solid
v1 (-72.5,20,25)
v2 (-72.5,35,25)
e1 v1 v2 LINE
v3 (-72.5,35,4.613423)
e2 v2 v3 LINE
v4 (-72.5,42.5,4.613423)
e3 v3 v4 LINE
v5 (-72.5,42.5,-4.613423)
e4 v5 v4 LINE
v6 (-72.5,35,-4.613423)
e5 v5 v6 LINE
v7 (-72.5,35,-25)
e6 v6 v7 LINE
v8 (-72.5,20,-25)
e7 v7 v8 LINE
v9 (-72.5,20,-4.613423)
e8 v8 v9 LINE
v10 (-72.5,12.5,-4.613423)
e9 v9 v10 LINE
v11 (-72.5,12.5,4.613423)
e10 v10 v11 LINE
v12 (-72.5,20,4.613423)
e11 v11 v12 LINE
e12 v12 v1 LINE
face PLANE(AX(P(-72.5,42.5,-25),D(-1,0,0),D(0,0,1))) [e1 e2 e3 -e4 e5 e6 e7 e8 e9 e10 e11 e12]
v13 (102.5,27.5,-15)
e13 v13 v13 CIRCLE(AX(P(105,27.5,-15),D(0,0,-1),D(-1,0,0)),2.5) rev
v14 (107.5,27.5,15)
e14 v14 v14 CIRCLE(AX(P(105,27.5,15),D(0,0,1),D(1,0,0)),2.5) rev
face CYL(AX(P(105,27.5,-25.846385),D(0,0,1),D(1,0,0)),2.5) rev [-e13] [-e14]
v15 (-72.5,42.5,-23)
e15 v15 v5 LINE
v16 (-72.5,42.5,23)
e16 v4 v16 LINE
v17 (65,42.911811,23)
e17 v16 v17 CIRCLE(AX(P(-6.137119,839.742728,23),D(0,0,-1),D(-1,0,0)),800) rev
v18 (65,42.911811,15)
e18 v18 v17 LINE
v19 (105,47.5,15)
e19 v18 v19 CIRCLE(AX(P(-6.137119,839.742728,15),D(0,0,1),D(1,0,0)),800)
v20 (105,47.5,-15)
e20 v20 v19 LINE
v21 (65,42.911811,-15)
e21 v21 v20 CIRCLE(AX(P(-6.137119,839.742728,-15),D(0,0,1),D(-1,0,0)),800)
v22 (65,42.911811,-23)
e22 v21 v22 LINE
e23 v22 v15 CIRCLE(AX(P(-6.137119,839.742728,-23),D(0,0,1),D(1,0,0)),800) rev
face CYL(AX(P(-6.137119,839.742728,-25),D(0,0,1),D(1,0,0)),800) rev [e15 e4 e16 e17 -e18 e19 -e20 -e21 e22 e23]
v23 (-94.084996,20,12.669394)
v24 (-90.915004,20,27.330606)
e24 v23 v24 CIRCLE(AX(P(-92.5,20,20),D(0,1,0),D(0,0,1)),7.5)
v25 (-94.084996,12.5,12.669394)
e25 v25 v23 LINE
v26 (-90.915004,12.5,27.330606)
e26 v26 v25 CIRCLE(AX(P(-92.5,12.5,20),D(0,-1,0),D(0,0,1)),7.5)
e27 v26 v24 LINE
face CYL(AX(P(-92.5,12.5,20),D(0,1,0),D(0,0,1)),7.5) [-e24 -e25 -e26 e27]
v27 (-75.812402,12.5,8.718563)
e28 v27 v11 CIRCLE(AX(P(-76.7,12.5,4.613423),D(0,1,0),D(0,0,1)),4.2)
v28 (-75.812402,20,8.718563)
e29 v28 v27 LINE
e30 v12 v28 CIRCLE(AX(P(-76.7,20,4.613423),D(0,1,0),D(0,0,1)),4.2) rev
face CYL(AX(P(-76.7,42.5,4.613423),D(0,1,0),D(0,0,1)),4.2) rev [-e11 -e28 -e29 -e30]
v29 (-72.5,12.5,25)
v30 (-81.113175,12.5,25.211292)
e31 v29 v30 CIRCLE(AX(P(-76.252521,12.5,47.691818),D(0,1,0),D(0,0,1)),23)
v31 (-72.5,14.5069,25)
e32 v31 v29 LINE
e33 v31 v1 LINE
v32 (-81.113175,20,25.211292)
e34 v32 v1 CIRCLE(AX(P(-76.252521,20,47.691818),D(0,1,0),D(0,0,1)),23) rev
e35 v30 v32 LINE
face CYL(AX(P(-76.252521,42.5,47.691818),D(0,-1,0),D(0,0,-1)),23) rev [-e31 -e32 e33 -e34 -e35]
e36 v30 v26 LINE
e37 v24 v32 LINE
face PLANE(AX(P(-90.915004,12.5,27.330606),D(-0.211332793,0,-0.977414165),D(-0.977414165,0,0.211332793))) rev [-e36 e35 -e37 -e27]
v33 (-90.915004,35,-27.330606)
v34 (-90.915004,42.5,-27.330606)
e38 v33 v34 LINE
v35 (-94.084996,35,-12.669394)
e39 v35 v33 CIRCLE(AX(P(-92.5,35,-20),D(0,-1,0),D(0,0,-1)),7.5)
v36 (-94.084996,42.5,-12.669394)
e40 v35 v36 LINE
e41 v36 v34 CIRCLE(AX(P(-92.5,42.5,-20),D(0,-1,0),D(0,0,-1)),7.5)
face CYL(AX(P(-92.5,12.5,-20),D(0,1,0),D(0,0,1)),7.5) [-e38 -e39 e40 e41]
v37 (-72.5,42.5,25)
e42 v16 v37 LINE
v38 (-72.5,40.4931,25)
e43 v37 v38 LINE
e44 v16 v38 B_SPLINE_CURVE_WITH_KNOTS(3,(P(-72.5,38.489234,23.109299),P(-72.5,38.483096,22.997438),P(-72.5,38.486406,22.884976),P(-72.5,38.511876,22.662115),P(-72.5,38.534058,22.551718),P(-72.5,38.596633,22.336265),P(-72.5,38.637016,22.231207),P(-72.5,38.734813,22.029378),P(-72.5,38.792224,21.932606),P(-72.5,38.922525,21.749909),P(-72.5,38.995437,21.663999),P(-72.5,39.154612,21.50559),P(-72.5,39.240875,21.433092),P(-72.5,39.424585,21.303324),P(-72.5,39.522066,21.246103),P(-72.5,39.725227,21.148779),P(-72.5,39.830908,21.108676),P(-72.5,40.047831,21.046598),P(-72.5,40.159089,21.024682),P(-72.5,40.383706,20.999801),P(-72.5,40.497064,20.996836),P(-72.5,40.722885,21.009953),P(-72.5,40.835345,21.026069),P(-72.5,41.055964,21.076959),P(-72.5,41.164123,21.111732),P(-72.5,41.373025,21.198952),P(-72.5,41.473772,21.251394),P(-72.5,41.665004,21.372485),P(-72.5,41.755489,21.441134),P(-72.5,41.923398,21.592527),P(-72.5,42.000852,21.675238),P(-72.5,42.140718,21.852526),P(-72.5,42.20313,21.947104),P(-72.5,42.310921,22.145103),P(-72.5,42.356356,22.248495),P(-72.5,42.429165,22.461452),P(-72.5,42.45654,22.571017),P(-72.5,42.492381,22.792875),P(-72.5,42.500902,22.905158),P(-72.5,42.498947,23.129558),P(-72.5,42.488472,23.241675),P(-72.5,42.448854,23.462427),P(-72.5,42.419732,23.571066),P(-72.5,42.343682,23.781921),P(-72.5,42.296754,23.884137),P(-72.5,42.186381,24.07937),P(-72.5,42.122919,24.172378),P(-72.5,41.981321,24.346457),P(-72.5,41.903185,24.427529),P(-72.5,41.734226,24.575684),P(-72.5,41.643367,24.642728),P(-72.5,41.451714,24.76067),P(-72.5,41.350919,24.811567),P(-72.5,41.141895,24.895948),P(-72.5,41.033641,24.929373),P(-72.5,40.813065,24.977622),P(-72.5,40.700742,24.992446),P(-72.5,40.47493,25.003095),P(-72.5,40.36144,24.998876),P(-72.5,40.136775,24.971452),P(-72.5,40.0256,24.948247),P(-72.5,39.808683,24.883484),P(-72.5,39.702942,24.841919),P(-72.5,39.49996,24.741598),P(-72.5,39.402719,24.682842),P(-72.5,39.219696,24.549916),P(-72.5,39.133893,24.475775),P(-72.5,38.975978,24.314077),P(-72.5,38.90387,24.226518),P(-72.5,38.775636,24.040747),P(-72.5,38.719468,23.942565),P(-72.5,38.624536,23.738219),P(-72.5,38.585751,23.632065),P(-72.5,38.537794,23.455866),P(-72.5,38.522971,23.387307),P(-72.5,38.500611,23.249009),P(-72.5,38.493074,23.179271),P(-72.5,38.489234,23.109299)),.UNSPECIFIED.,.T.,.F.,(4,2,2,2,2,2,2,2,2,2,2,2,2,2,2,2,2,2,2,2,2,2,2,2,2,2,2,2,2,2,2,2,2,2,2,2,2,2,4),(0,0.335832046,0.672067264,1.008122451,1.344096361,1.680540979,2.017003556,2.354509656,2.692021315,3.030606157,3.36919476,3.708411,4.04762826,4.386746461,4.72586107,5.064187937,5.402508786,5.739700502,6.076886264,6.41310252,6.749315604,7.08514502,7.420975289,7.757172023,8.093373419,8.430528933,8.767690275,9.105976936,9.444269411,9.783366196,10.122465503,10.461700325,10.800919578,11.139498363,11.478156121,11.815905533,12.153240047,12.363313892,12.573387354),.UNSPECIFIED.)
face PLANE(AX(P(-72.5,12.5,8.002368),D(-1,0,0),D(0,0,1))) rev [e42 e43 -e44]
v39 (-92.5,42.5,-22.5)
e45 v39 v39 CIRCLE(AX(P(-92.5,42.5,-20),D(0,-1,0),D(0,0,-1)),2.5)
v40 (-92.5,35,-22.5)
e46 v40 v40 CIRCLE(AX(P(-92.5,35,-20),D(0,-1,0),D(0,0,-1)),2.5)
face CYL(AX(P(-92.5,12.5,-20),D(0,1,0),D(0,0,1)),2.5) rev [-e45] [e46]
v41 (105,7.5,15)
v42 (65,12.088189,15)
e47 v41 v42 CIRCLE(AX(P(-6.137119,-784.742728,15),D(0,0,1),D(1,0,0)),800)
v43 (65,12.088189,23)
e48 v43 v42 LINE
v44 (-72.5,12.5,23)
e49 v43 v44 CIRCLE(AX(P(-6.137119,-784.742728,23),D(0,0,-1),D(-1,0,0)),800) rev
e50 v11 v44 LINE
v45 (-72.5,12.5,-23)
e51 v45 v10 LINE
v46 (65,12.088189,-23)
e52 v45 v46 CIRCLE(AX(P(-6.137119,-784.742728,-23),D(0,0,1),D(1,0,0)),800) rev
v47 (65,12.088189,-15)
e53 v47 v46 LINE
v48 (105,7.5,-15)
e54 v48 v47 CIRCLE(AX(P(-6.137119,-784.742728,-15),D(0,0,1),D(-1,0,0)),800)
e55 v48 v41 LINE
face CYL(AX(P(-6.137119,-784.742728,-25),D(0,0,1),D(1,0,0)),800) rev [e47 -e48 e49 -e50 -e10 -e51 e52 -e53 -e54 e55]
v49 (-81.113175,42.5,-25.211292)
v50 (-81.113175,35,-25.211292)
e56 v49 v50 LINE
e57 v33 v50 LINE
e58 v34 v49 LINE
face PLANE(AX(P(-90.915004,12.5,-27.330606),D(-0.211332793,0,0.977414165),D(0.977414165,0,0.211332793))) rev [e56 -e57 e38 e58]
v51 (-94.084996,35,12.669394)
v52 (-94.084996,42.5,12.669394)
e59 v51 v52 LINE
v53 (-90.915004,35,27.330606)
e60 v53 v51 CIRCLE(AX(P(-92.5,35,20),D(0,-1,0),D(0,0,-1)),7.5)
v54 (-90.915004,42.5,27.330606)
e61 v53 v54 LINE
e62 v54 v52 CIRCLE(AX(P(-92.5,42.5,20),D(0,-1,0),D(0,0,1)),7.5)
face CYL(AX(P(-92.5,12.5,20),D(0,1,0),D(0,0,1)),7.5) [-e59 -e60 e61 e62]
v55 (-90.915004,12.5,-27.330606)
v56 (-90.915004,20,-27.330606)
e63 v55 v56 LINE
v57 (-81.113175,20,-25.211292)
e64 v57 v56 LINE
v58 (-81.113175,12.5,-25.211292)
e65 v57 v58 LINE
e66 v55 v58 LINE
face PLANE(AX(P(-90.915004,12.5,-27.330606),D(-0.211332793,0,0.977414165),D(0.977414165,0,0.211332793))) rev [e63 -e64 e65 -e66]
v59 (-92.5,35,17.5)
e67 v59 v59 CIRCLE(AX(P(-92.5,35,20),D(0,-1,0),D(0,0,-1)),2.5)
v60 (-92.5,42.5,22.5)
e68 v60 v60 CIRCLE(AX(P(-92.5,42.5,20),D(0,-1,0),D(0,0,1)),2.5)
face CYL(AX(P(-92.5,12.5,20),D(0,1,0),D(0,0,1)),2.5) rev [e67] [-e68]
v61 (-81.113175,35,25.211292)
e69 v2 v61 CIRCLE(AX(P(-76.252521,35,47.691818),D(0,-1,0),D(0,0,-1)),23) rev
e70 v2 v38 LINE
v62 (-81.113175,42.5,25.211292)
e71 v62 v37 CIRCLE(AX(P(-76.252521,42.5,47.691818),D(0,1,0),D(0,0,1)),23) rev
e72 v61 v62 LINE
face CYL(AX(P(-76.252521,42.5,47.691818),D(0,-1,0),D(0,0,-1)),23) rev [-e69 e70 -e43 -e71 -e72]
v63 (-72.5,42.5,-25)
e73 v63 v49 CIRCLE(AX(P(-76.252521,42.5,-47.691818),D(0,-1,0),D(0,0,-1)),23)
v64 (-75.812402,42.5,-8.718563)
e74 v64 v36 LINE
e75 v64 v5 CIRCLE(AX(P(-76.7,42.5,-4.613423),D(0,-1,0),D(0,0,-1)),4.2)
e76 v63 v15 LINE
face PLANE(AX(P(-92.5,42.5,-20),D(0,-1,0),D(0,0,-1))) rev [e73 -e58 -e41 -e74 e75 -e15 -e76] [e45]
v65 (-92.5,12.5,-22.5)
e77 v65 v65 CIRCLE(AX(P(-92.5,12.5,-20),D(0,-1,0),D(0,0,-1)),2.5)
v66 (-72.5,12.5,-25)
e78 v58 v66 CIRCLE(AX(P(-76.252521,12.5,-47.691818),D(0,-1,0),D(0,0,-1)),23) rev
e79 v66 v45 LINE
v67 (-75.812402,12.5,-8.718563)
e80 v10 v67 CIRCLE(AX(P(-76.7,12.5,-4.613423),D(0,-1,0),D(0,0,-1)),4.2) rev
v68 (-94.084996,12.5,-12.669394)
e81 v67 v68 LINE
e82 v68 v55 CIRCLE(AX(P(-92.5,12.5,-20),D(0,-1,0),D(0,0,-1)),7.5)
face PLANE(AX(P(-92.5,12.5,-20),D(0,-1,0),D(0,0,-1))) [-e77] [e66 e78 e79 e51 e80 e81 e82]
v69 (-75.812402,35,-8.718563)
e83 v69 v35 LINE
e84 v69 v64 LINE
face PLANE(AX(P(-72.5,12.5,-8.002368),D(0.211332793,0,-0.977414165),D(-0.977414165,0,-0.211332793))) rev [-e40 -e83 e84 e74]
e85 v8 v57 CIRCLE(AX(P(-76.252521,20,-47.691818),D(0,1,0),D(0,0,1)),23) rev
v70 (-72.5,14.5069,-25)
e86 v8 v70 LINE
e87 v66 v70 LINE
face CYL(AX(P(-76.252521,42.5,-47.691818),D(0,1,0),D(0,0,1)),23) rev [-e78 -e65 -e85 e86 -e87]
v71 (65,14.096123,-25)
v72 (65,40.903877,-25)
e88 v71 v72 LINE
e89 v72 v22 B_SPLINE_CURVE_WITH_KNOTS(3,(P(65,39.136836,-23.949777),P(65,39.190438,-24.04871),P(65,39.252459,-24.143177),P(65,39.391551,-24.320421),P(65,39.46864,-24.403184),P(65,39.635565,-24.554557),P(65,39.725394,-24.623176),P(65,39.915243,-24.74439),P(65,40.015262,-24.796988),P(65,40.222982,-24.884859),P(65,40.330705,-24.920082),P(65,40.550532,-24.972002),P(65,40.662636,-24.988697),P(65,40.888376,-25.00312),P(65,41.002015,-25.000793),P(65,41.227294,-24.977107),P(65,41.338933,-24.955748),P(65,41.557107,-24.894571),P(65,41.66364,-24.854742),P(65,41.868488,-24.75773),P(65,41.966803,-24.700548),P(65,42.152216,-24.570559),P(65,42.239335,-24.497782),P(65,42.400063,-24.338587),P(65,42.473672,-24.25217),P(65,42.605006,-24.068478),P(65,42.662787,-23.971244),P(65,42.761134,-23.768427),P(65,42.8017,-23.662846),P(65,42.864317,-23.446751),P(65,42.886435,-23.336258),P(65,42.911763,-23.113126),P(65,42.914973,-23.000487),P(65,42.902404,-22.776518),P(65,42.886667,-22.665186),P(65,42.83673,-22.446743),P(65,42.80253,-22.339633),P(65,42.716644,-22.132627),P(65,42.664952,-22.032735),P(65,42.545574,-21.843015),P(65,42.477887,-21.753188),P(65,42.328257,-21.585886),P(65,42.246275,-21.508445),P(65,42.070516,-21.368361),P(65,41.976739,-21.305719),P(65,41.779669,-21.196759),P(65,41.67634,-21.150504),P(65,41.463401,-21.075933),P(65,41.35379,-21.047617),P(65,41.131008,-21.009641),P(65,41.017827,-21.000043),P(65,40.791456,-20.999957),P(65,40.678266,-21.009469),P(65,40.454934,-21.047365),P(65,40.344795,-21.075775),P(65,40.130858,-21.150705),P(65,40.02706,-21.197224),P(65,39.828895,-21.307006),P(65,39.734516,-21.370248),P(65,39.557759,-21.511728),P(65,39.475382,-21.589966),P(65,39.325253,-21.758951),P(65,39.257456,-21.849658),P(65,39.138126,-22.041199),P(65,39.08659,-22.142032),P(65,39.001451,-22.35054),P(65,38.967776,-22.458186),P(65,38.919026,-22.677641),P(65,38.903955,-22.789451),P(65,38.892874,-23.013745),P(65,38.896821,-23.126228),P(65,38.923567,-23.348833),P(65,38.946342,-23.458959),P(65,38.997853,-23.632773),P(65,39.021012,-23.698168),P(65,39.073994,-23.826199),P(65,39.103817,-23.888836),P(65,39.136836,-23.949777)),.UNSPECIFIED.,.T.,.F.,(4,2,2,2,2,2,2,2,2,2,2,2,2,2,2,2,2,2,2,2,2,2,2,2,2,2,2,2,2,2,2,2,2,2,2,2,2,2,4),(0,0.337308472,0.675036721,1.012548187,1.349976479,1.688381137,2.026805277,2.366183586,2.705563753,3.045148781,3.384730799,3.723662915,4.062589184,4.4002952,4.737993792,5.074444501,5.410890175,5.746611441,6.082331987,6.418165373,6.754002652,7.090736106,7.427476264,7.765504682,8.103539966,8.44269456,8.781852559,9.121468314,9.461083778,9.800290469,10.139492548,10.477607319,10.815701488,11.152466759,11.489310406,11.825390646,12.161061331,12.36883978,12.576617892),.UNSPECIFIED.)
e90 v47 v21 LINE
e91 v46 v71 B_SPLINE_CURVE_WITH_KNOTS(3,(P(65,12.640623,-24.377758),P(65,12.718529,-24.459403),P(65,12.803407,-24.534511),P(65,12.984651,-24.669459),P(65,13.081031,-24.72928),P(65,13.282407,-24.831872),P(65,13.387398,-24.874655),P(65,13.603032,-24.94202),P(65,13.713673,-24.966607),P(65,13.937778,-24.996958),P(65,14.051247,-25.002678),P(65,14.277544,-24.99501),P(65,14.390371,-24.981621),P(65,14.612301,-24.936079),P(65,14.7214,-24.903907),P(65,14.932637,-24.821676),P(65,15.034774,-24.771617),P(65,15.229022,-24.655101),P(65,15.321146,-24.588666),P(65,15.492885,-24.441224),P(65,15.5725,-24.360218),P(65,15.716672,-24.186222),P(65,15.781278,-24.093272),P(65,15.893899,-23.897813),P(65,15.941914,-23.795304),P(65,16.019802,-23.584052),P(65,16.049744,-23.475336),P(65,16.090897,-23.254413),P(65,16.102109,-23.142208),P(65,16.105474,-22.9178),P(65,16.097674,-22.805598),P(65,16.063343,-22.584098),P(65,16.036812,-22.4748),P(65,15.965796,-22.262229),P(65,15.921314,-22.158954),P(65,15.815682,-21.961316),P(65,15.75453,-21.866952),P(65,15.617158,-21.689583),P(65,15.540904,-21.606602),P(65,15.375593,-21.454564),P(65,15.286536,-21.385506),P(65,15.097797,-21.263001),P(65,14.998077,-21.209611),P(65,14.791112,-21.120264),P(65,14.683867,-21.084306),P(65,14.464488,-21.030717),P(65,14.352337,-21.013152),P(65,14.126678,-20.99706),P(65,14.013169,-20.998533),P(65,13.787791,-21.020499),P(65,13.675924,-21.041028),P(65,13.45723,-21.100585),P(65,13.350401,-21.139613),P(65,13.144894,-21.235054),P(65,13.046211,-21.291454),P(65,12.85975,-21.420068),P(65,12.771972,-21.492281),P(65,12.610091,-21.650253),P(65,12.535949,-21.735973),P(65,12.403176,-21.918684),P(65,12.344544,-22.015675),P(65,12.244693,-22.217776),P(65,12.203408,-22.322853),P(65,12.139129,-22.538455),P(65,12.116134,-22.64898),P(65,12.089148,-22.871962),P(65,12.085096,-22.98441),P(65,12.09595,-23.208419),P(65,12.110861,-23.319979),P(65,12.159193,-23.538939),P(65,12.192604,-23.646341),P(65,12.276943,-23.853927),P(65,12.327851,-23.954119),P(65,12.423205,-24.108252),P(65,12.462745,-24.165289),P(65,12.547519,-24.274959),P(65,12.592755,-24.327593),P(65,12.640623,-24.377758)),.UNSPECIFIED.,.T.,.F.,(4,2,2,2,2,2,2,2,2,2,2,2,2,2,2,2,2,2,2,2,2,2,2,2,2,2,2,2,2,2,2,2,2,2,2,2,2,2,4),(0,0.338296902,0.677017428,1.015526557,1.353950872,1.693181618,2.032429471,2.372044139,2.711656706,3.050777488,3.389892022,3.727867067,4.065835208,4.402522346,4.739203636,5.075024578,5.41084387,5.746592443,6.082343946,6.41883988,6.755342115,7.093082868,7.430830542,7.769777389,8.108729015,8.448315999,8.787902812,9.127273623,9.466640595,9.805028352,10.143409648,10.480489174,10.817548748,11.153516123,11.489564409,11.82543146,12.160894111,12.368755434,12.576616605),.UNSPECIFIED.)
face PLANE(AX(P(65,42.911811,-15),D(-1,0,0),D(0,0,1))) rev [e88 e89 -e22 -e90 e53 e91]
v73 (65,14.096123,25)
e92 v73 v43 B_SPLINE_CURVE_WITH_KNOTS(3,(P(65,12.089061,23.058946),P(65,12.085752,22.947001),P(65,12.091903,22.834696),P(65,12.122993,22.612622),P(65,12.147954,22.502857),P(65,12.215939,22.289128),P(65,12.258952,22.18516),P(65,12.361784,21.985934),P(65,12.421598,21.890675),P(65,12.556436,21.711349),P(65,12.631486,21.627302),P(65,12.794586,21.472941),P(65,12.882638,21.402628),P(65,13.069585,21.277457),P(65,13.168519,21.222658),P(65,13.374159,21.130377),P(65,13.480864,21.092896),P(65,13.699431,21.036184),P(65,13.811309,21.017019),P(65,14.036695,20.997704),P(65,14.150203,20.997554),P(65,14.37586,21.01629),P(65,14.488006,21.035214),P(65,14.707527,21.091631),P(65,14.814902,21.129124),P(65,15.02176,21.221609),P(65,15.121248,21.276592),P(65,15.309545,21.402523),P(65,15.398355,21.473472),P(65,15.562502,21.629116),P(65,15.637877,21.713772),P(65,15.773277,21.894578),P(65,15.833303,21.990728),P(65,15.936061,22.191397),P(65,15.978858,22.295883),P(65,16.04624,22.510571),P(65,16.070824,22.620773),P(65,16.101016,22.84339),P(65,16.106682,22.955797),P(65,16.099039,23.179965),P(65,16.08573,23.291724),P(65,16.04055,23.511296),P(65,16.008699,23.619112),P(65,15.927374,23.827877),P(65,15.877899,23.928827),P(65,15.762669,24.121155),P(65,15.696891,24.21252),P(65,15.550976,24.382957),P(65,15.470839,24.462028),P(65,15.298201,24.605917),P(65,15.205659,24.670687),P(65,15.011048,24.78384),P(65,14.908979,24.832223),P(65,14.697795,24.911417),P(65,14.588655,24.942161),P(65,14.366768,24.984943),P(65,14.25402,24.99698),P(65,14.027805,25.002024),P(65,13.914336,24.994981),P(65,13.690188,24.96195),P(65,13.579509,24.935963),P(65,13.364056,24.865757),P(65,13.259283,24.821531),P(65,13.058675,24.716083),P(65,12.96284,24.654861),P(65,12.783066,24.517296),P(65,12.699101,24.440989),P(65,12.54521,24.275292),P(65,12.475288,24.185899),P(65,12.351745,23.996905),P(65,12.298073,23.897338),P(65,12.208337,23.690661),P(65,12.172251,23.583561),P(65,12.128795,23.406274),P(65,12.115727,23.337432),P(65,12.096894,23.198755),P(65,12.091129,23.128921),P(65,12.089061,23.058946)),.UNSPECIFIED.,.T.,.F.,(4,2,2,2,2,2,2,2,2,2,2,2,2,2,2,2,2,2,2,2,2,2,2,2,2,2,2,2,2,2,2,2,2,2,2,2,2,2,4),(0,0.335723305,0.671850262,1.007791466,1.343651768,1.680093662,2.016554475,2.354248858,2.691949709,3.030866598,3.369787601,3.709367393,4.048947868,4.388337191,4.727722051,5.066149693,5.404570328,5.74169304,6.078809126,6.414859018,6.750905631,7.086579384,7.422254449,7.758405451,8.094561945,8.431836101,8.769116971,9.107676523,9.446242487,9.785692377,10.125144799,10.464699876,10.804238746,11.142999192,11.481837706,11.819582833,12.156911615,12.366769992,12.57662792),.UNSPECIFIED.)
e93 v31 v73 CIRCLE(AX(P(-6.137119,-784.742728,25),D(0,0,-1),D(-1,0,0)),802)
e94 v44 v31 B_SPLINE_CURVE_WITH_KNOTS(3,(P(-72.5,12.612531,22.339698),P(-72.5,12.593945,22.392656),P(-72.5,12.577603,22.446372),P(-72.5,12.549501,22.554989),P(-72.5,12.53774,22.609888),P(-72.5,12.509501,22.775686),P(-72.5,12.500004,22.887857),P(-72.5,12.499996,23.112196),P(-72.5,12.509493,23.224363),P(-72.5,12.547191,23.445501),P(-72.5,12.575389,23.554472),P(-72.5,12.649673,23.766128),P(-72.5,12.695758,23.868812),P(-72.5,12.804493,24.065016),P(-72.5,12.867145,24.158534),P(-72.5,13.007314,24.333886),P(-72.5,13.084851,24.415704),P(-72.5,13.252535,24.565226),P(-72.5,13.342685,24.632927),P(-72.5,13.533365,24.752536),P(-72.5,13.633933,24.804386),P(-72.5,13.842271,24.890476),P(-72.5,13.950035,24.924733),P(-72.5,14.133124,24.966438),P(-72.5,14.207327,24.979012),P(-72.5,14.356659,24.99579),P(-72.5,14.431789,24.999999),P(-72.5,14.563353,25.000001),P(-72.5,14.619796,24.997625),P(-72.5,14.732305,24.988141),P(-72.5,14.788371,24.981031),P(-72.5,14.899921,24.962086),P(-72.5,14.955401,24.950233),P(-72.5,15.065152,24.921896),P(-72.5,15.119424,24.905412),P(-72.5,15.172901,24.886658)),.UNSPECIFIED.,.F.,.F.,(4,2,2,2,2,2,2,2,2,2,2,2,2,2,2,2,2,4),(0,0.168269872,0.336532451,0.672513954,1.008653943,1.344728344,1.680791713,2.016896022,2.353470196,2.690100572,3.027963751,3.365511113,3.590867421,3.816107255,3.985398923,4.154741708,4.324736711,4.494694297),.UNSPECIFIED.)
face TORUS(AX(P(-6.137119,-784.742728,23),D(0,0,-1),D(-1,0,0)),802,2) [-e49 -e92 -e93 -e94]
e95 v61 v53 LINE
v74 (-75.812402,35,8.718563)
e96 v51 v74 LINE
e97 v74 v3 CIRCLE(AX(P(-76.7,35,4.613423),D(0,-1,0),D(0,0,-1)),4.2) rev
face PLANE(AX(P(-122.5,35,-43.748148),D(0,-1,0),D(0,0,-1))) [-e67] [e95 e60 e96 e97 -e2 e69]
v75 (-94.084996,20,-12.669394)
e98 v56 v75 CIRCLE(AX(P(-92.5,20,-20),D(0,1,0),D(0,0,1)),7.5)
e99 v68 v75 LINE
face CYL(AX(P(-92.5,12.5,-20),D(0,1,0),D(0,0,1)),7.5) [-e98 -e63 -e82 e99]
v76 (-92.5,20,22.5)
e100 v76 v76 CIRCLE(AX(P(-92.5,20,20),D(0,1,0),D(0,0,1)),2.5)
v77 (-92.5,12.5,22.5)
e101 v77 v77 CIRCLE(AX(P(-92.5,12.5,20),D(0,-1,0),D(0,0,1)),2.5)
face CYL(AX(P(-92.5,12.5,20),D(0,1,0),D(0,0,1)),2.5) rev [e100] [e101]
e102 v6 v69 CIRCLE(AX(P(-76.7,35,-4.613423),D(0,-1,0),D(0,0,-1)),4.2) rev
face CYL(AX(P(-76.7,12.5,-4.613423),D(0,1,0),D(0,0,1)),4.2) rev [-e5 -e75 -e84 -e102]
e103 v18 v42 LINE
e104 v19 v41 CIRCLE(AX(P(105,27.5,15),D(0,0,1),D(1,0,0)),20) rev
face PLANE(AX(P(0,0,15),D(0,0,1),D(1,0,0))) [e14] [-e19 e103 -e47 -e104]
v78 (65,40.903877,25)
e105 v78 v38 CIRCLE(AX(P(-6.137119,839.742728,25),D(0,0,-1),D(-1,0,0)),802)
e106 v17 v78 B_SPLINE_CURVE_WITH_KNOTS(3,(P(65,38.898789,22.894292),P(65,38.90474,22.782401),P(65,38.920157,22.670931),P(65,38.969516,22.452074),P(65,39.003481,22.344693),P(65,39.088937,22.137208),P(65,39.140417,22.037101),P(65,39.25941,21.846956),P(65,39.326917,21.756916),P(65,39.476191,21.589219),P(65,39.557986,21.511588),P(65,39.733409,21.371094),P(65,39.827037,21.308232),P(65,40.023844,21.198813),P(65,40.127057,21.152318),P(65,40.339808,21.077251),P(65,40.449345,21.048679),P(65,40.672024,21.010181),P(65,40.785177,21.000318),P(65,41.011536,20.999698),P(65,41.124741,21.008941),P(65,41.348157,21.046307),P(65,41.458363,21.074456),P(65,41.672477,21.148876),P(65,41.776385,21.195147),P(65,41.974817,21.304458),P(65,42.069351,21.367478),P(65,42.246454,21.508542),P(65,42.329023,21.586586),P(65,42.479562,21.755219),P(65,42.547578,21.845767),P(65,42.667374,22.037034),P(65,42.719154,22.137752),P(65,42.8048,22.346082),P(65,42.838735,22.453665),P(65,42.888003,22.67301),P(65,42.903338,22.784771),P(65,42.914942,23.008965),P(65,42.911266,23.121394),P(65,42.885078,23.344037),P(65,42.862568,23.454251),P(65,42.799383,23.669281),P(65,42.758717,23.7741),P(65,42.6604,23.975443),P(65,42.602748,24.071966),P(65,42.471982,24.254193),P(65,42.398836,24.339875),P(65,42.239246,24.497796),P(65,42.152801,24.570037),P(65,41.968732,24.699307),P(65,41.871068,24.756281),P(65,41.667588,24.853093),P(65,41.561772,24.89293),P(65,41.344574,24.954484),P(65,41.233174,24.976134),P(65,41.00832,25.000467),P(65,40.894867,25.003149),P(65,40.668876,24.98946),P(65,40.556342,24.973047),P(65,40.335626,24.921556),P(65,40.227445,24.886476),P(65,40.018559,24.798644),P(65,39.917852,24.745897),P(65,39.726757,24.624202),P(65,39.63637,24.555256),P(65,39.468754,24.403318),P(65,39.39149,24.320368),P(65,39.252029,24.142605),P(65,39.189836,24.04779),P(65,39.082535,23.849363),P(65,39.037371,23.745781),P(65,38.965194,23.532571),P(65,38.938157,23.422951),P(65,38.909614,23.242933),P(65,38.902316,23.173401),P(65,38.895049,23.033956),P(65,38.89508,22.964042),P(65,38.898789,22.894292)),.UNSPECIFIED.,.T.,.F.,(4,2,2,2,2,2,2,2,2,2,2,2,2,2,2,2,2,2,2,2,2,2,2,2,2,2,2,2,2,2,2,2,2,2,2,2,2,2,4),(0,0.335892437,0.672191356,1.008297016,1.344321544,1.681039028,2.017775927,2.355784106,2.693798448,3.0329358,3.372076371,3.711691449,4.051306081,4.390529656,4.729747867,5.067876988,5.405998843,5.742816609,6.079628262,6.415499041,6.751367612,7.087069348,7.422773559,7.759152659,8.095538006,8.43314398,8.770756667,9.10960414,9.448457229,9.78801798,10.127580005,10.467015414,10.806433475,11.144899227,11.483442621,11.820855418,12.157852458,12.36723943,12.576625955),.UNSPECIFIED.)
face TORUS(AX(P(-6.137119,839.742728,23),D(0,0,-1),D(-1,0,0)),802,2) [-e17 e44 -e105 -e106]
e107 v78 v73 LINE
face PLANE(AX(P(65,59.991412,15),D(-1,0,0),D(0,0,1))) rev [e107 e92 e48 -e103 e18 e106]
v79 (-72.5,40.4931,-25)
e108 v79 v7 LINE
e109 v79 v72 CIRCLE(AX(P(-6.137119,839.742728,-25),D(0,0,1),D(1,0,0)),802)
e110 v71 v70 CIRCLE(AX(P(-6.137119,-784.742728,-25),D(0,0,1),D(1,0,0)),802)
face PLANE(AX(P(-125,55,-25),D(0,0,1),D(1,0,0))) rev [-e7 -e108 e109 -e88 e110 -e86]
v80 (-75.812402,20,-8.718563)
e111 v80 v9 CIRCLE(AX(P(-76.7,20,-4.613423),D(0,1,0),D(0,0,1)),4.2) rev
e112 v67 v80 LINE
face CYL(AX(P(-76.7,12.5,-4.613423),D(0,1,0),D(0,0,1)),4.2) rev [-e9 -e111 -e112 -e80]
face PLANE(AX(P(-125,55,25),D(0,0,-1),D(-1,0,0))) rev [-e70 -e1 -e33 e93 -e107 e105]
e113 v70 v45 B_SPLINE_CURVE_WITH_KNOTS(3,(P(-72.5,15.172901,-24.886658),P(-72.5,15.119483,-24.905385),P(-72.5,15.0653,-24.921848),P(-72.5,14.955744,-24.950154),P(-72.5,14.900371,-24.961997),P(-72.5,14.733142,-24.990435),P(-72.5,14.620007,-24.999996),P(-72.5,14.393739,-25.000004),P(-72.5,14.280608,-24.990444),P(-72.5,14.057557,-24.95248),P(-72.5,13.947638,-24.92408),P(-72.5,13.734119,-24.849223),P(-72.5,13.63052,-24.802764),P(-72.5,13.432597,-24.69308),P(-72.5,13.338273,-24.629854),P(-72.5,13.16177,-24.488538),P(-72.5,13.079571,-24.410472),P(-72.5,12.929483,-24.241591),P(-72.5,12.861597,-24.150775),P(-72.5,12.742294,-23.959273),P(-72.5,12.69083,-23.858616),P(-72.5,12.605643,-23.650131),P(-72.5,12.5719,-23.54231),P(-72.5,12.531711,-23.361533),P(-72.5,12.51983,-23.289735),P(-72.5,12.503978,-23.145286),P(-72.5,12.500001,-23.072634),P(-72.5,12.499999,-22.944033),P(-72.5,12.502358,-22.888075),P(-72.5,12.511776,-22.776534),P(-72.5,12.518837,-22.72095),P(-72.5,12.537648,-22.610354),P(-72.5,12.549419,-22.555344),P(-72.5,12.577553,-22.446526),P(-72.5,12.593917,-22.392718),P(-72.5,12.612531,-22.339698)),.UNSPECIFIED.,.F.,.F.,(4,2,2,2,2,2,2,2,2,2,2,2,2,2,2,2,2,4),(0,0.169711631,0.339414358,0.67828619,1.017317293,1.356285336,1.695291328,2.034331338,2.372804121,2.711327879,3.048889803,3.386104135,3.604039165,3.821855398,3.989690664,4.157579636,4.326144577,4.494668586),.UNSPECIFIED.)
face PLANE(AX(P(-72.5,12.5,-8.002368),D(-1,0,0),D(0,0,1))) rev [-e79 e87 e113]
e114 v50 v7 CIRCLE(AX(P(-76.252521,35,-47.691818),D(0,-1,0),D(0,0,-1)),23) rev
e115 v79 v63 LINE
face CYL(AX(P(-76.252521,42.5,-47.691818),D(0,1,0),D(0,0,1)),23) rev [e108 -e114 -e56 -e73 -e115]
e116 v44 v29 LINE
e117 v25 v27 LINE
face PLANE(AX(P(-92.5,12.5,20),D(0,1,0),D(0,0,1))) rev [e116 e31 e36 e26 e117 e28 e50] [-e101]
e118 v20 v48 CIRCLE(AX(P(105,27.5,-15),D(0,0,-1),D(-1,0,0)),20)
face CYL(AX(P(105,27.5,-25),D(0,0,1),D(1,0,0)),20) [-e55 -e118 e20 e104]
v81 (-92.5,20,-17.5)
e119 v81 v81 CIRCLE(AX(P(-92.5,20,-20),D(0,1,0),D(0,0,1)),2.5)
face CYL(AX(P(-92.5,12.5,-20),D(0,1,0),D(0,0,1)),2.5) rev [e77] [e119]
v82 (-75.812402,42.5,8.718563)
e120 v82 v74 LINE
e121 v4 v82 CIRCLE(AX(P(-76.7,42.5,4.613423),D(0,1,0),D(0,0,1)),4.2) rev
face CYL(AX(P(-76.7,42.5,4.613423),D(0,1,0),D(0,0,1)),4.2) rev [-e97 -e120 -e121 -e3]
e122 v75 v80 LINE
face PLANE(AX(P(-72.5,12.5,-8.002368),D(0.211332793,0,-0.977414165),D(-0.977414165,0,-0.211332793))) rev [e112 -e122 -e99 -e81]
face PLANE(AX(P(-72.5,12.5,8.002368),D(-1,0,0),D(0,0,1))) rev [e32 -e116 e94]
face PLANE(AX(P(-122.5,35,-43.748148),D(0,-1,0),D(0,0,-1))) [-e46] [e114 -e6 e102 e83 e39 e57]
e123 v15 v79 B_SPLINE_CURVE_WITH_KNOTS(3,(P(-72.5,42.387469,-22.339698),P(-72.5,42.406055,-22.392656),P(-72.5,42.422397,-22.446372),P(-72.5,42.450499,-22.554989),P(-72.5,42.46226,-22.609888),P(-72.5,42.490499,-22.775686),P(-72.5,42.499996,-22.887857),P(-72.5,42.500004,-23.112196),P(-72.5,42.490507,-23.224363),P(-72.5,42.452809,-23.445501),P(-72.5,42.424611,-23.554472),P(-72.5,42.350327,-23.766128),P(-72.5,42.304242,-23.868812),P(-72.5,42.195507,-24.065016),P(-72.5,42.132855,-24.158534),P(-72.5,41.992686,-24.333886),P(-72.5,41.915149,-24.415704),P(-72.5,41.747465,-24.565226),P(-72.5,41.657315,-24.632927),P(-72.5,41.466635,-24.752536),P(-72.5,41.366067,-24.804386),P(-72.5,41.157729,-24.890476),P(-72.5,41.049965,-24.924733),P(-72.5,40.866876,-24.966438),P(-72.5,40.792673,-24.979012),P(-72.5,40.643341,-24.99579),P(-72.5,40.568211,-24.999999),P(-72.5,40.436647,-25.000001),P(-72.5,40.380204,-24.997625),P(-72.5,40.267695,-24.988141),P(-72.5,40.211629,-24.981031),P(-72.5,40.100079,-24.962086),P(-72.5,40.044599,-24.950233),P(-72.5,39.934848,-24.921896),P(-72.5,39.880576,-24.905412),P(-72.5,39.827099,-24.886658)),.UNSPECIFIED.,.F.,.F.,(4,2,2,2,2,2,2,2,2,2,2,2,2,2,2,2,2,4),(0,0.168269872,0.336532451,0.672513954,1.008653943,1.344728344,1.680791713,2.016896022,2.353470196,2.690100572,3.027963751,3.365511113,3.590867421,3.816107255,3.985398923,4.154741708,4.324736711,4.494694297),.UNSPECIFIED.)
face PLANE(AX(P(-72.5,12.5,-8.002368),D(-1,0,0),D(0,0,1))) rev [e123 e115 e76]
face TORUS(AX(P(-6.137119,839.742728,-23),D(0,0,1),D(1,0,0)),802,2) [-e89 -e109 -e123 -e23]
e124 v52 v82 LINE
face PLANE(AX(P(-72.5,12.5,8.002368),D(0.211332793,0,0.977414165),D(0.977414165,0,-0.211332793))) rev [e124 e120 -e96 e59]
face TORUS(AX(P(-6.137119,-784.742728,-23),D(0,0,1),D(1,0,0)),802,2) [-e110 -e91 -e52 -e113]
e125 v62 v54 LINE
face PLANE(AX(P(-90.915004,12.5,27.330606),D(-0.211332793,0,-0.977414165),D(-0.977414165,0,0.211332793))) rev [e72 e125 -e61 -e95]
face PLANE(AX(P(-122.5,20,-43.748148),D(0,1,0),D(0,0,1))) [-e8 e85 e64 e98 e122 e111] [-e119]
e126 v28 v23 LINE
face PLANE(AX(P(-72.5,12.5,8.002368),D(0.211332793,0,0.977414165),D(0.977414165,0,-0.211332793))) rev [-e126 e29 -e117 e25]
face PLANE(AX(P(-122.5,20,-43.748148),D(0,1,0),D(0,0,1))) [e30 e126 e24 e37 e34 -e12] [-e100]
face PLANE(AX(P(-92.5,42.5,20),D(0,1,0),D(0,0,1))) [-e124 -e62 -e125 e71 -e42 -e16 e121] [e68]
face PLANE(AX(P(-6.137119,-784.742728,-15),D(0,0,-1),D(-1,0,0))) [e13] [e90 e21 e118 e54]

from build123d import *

# Parameters (mm, degrees)
SKETCH1_W               = 250
SKETCH1_H               = 50
BOSS_EXTRUDE1_DEPTH     = 55
CUT_EXTRUDE2_DEPTH      = 146.430395722
CUT_EXTRUDE2_DEPTH_BACK = 146.430395722
SKETCH4_OUTSIDE_W       = 304.164
SKETCH4_OUTSIDE_H       = 109.164
FILLET2_R               = 2
CUT_EXTRUDE3_DEPTH      = 143.762915509
CUT_EXTRUDE3_DEPTH_BACK = 143.762915509
SKETCH7_R               = 2.5
SKETCH12_W              = 86.46924187
SKETCH12_H              = 64.710234819
CUT_EXTRUDE7_DEPTH      = 10
CUT_EXTRUDE8_DEPTH      = 10
SKETCH14_R              = 2.5
BOSS_EXTRUDE2_DEPTH     = 30
SKETCH16_W              = 96.26246385
SKETCH16_H              = 15
CUT_EXTRUDE9_DEPTH      = 50
FILLET3_R               = 4.2
FILLET4_R               = 23


with BuildPart() as part:
    # Sketch1 → Boss-Extrude1 (new body)
    with BuildSketch(Plane(origin=(0, 0, 0), x_dir=(1, 0, 0), z_dir=(0, 1, 0))):
        Rectangle(SKETCH1_W, SKETCH1_H)
    extrude(amount=BOSS_EXTRUDE1_DEPTH)

    # Sketch4 outside → Cut-Extrude2 (cut, two sides: drawn at the far end of the back side and taken through both)
    with BuildSketch(Plane.XY.offset(25).offset(-CUT_EXTRUDE2_DEPTH_BACK)):
        with Locations((0, 27.5)):
            Rectangle(SKETCH4_OUTSIDE_W, SKETCH4_OUTSIDE_H)
        with BuildLine():
            Line((-72.5, 42.5), (-72.5, 12.5))
            ThreePointArc((-72.5, 12.5), (16.389156704, 14.940062989), (105, 7.5))
            ThreePointArc((105, 7.5), (125, 27.5), (105, 47.5))
            ThreePointArc((105, 47.5), (16.389156704, 40.059937011), (-72.5, 42.5))
        make_face(mode=Mode.SUBTRACT)
    extrude(amount=CUT_EXTRUDE2_DEPTH + CUT_EXTRUDE2_DEPTH_BACK, mode=Mode.SUBTRACT)

    # Fillet2
    fillet2_edges = [part.edges().sort_by_distance(p)[0] for p in [
        (16.389156704, 14.940062989, 25),
        (16.389156704, 40.059937011, 25),
        (16.389156704, 40.059937011, -25),
        (16.389156704, 14.940062989, -25),
    ]]
    fillet(fillet2_edges, radius=FILLET2_R)

    # Sketch7 → Cut-Extrude3 (cut, two sides: drawn at the far end of the back side and taken through both)
    with BuildSketch(Plane.XY.offset(25).offset(-CUT_EXTRUDE3_DEPTH_BACK)):
        with Locations((105, 27.5)):
            Circle(SKETCH7_R)
    extrude(amount=CUT_EXTRUDE3_DEPTH + CUT_EXTRUDE3_DEPTH_BACK, mode=Mode.SUBTRACT)

    # Sketch12 → Cut-Extrude7 (cut)
    with BuildSketch(Plane.XY.offset(25)):
        with Locations((108.234620935, 27.636294559)):
            Rectangle(SKETCH12_W, SKETCH12_H)
    extrude(amount=-CUT_EXTRUDE7_DEPTH, mode=Mode.SUBTRACT)

    # Sketch13 → Cut-Extrude8 (cut)
    with BuildSketch(Plane(origin=(0, 0, -25), x_dir=(-1, 0, 0), z_dir=(0, 0, -1))):
        with BuildLine():
            Line((-65, 42.911811435), (-65, 12.088188565))
            ThreePointArc((-65, 12.088188565), (-85.028868782, 10.045773403), (-105, 7.5))
            ThreePointArc((-105, 7.5), (-125, 27.5), (-105, 47.5))
            ThreePointArc((-105, 47.5), (-85.028868782, 44.954226597), (-65, 42.911811435))
        make_face()
    extrude(amount=-CUT_EXTRUDE8_DEPTH, mode=Mode.SUBTRACT)

    # Sketch14 → Boss-Extrude2 (add)
    # profile 1 of 2: a face of its own
    with BuildSketch(Plane(origin=(0, 42.5, 0), x_dir=(0, 0, 1), z_dir=(0, -1, 0))):
        with BuildLine():
            Line((-8.002367609, 72.5), (-12.669393759, 94.084995944))
            ThreePointArc((-12.669393759, 94.084995944), (-21.584995944, 99.830606241), (-27.330606241, 90.915004056))
            Line((-27.330606241, 90.915004056), (-23.348983742, 72.5))
            Line((-23.348983742, 72.5), (-8.002367609, 72.5))
        make_face()
        with Locations(Location((-20, 92.5, 0), (0, 0, 180))):
            Circle(SKETCH14_R, mode=Mode.SUBTRACT)
    # profile 2 of 2: a face of its own
    with BuildSketch(Plane(origin=(0, 42.5, 0), x_dir=(0, 0, 1), z_dir=(0, -1, 0))):
        with BuildLine():
            Line((27.330606241, 90.915004056), (23.348983742, 72.5))
            Line((23.348983742, 72.5), (8.002367609, 72.5))
            Line((8.002367609, 72.5), (12.669393759, 94.084995944))
            ThreePointArc((12.669393759, 94.084995944), (21.584995944, 99.830606241), (27.330606241, 90.915004056))
        make_face()
        with Locations((20, 92.5)):
            Circle(SKETCH14_R, mode=Mode.SUBTRACT)
    extrude(amount=BOSS_EXTRUDE2_DEPTH)

    # Sketch16 → Cut-Extrude9 (cut)
    with BuildSketch(Plane.ZY.offset(72.5)):
        with Locations((4.383084191, 27.5)):
            Rectangle(SKETCH16_W, SKETCH16_H)
    extrude(amount=CUT_EXTRUDE9_DEPTH, mode=Mode.SUBTRACT)

    # Fillet3
    fillet3_edges = [part.edges().sort_by_distance(p)[0] for p in [
        (-72.5, 16.25, -8.002367609),
        (-72.5, 16.25, 8.002367609),
        (-72.5, 38.75, 8.002367609),
        (-72.5, 38.75, -8.002367609),
    ]]
    fillet(fillet3_edges, radius=FILLET3_R)

    # Fillet4
    # the kernel refuses this fillet: 23 mm, written as the material it adds along each edge
    with BuildSketch(Plane(origin=(-72.5, 42.030514973, -23.348983742), x_dir=(0, 0, -1), z_dir=(0, -1, 0))) as fillet4_piece_1_section:
        with BuildLine():
            CenterArc((24.342833905, -3.752520734), FILLET4_R, 170.610040363, 21.590428365)
            Line((1.8623081, -8.613174962), (0, 0))
            Line((0, 0), (1.651016258, 0))
        make_face()
    fillet4_piece_1 = extrude(amount=51.530241063, mode=Mode.PRIVATE)
    fillet4_piece_1 = split(fillet4_piece_1, bisect_by=Plane(origin=(-72.5, 35, -23.348983742), z_dir=(0, 1, 0)), keep=Keep.TOP, mode=Mode.PRIVATE)
    add(fillet4_piece_1)
    with BuildSketch(Plane(origin=(-72.5, 20, -23.348983742), x_dir=(0, 0, -1), z_dir=(0, -1, 0))) as fillet4_piece_2_section:
        with BuildLine():
            CenterArc((24.342833905, -3.752520734), FILLET4_R, 170.610040363, 21.590428365)
            Line((1.8623081, -8.613174962), (0, 0))
            Line((0, 0), (1.651016258, 0))
        make_face()
    fillet4_piece_2 = extrude(amount=29.49972609, mode=Mode.PRIVATE)
    fillet4_piece_2 = split(fillet4_piece_2, bisect_by=Plane(origin=(-72.5, 12.5, -23.348983742), z_dir=(0, 1, 0)), keep=Keep.TOP, mode=Mode.PRIVATE)
    add(fillet4_piece_2)
    with BuildSketch(Plane(origin=(-72.5, 64.49972609, -23.348983742), x_dir=(0, 0, -1), z_dir=(0, -1, 0))) as fillet4_piece_3_section:
        with BuildLine():
            CenterArc((24.342833905, -3.752520734), FILLET4_R, 170.610040363, 21.590428365)
            Line((1.8623081, -8.613174962), (0, 0))
            Line((0, 0), (1.651016258, 0))
        make_face()
    fillet4_piece_3 = extrude(amount=29.49972609, mode=Mode.PRIVATE)
    fillet4_piece_3 = split(fillet4_piece_3, bisect_by=Plane(origin=(-72.5, 42.5, -23.348983742), z_dir=(0, -1, 0)), keep=Keep.TOP, mode=Mode.PRIVATE)
    add(fillet4_piece_3)
    with BuildSketch(Plane(origin=(-72.5, 64.49972609, -23.348983742), x_dir=(0, 0, -1), z_dir=(0, -1, 0))) as fillet4_piece_4_section:
        with BuildLine():
            CenterArc((24.342833905, -3.752520734), FILLET4_R, 170.610040363, 21.590428365)
            Line((1.8623081, -8.613174962), (0, 0))
            Line((0, 0), (1.651016258, 0))
        make_face()
    fillet4_piece_4 = extrude(amount=51.530241063, mode=Mode.PRIVATE)
    fillet4_piece_4 = split(fillet4_piece_4, bisect_by=Plane(origin=(-72.5, 20, -23.348983742), z_dir=(0, -1, 0)), keep=Keep.TOP, mode=Mode.PRIVATE)
    add(fillet4_piece_4)
    with BuildSketch(Plane(origin=(-72.5, 42.030514973, 23.348983742), x_dir=(0, 0, 1), z_dir=(0, -1, 0))) as fillet4_piece_5_section:
        with BuildLine():
            CenterArc((24.342833905, 3.752520734), FILLET4_R, 167.799531273, 21.590428365)
            Line((1.8623081, 8.613174962), (0, 0))
            Line((0, 0), (1.651016258, 0))
        make_face()
    fillet4_piece_5 = extrude(amount=51.530241063, mode=Mode.PRIVATE)
    fillet4_piece_5 = split(fillet4_piece_5, bisect_by=Plane(origin=(-72.5, 35, 23.348983742), z_dir=(0, 1, 0)), keep=Keep.TOP, mode=Mode.PRIVATE)
    add(fillet4_piece_5)
    with BuildSketch(Plane(origin=(-72.5, 20, 23.348983742), x_dir=(0, 0, 1), z_dir=(0, -1, 0))) as fillet4_piece_6_section:
        with BuildLine():
            CenterArc((24.342833905, 3.752520734), FILLET4_R, 167.799531273, 21.590428365)
            Line((1.8623081, 8.613174962), (0, 0))
            Line((0, 0), (1.651016258, 0))
        make_face()
    fillet4_piece_6 = extrude(amount=29.49972609, mode=Mode.PRIVATE)
    fillet4_piece_6 = split(fillet4_piece_6, bisect_by=Plane(origin=(-72.5, 12.5, 23.348983742), z_dir=(0, 1, 0)), keep=Keep.TOP, mode=Mode.PRIVATE)
    add(fillet4_piece_6)
    with BuildSketch(Plane(origin=(-72.5, 64.49972609, 23.348983742), x_dir=(0, 0, 1), z_dir=(0, -1, 0))) as fillet4_piece_7_section:
        with BuildLine():
            CenterArc((24.342833905, 3.752520734), FILLET4_R, 167.799531273, 21.590428365)
            Line((1.8623081, 8.613174962), (0, 0))
            Line((0, 0), (1.651016258, 0))
        make_face()
    fillet4_piece_7 = extrude(amount=29.49972609, mode=Mode.PRIVATE)
    fillet4_piece_7 = split(fillet4_piece_7, bisect_by=Plane(origin=(-72.5, 42.5, 23.348983742), z_dir=(0, -1, 0)), keep=Keep.TOP, mode=Mode.PRIVATE)
    add(fillet4_piece_7)
    with BuildSketch(Plane(origin=(-72.5, 64.49972609, 23.348983742), x_dir=(0, 0, 1), z_dir=(0, -1, 0))) as fillet4_piece_8_section:
        with BuildLine():
            CenterArc((24.342833905, 3.752520734), FILLET4_R, 167.799531273, 21.590428365)
            Line((1.8623081, 8.613174962), (0, 0))
            Line((0, 0), (1.651016258, 0))
        make_face()
    fillet4_piece_8 = extrude(amount=51.530241063, mode=Mode.PRIVATE)
    fillet4_piece_8 = split(fillet4_piece_8, bisect_by=Plane(origin=(-72.5, 20, 23.348983742), z_dir=(0, -1, 0)), keep=Keep.TOP, mode=Mode.PRIVATE)
    add(fillet4_piece_8)


solid = part.part
